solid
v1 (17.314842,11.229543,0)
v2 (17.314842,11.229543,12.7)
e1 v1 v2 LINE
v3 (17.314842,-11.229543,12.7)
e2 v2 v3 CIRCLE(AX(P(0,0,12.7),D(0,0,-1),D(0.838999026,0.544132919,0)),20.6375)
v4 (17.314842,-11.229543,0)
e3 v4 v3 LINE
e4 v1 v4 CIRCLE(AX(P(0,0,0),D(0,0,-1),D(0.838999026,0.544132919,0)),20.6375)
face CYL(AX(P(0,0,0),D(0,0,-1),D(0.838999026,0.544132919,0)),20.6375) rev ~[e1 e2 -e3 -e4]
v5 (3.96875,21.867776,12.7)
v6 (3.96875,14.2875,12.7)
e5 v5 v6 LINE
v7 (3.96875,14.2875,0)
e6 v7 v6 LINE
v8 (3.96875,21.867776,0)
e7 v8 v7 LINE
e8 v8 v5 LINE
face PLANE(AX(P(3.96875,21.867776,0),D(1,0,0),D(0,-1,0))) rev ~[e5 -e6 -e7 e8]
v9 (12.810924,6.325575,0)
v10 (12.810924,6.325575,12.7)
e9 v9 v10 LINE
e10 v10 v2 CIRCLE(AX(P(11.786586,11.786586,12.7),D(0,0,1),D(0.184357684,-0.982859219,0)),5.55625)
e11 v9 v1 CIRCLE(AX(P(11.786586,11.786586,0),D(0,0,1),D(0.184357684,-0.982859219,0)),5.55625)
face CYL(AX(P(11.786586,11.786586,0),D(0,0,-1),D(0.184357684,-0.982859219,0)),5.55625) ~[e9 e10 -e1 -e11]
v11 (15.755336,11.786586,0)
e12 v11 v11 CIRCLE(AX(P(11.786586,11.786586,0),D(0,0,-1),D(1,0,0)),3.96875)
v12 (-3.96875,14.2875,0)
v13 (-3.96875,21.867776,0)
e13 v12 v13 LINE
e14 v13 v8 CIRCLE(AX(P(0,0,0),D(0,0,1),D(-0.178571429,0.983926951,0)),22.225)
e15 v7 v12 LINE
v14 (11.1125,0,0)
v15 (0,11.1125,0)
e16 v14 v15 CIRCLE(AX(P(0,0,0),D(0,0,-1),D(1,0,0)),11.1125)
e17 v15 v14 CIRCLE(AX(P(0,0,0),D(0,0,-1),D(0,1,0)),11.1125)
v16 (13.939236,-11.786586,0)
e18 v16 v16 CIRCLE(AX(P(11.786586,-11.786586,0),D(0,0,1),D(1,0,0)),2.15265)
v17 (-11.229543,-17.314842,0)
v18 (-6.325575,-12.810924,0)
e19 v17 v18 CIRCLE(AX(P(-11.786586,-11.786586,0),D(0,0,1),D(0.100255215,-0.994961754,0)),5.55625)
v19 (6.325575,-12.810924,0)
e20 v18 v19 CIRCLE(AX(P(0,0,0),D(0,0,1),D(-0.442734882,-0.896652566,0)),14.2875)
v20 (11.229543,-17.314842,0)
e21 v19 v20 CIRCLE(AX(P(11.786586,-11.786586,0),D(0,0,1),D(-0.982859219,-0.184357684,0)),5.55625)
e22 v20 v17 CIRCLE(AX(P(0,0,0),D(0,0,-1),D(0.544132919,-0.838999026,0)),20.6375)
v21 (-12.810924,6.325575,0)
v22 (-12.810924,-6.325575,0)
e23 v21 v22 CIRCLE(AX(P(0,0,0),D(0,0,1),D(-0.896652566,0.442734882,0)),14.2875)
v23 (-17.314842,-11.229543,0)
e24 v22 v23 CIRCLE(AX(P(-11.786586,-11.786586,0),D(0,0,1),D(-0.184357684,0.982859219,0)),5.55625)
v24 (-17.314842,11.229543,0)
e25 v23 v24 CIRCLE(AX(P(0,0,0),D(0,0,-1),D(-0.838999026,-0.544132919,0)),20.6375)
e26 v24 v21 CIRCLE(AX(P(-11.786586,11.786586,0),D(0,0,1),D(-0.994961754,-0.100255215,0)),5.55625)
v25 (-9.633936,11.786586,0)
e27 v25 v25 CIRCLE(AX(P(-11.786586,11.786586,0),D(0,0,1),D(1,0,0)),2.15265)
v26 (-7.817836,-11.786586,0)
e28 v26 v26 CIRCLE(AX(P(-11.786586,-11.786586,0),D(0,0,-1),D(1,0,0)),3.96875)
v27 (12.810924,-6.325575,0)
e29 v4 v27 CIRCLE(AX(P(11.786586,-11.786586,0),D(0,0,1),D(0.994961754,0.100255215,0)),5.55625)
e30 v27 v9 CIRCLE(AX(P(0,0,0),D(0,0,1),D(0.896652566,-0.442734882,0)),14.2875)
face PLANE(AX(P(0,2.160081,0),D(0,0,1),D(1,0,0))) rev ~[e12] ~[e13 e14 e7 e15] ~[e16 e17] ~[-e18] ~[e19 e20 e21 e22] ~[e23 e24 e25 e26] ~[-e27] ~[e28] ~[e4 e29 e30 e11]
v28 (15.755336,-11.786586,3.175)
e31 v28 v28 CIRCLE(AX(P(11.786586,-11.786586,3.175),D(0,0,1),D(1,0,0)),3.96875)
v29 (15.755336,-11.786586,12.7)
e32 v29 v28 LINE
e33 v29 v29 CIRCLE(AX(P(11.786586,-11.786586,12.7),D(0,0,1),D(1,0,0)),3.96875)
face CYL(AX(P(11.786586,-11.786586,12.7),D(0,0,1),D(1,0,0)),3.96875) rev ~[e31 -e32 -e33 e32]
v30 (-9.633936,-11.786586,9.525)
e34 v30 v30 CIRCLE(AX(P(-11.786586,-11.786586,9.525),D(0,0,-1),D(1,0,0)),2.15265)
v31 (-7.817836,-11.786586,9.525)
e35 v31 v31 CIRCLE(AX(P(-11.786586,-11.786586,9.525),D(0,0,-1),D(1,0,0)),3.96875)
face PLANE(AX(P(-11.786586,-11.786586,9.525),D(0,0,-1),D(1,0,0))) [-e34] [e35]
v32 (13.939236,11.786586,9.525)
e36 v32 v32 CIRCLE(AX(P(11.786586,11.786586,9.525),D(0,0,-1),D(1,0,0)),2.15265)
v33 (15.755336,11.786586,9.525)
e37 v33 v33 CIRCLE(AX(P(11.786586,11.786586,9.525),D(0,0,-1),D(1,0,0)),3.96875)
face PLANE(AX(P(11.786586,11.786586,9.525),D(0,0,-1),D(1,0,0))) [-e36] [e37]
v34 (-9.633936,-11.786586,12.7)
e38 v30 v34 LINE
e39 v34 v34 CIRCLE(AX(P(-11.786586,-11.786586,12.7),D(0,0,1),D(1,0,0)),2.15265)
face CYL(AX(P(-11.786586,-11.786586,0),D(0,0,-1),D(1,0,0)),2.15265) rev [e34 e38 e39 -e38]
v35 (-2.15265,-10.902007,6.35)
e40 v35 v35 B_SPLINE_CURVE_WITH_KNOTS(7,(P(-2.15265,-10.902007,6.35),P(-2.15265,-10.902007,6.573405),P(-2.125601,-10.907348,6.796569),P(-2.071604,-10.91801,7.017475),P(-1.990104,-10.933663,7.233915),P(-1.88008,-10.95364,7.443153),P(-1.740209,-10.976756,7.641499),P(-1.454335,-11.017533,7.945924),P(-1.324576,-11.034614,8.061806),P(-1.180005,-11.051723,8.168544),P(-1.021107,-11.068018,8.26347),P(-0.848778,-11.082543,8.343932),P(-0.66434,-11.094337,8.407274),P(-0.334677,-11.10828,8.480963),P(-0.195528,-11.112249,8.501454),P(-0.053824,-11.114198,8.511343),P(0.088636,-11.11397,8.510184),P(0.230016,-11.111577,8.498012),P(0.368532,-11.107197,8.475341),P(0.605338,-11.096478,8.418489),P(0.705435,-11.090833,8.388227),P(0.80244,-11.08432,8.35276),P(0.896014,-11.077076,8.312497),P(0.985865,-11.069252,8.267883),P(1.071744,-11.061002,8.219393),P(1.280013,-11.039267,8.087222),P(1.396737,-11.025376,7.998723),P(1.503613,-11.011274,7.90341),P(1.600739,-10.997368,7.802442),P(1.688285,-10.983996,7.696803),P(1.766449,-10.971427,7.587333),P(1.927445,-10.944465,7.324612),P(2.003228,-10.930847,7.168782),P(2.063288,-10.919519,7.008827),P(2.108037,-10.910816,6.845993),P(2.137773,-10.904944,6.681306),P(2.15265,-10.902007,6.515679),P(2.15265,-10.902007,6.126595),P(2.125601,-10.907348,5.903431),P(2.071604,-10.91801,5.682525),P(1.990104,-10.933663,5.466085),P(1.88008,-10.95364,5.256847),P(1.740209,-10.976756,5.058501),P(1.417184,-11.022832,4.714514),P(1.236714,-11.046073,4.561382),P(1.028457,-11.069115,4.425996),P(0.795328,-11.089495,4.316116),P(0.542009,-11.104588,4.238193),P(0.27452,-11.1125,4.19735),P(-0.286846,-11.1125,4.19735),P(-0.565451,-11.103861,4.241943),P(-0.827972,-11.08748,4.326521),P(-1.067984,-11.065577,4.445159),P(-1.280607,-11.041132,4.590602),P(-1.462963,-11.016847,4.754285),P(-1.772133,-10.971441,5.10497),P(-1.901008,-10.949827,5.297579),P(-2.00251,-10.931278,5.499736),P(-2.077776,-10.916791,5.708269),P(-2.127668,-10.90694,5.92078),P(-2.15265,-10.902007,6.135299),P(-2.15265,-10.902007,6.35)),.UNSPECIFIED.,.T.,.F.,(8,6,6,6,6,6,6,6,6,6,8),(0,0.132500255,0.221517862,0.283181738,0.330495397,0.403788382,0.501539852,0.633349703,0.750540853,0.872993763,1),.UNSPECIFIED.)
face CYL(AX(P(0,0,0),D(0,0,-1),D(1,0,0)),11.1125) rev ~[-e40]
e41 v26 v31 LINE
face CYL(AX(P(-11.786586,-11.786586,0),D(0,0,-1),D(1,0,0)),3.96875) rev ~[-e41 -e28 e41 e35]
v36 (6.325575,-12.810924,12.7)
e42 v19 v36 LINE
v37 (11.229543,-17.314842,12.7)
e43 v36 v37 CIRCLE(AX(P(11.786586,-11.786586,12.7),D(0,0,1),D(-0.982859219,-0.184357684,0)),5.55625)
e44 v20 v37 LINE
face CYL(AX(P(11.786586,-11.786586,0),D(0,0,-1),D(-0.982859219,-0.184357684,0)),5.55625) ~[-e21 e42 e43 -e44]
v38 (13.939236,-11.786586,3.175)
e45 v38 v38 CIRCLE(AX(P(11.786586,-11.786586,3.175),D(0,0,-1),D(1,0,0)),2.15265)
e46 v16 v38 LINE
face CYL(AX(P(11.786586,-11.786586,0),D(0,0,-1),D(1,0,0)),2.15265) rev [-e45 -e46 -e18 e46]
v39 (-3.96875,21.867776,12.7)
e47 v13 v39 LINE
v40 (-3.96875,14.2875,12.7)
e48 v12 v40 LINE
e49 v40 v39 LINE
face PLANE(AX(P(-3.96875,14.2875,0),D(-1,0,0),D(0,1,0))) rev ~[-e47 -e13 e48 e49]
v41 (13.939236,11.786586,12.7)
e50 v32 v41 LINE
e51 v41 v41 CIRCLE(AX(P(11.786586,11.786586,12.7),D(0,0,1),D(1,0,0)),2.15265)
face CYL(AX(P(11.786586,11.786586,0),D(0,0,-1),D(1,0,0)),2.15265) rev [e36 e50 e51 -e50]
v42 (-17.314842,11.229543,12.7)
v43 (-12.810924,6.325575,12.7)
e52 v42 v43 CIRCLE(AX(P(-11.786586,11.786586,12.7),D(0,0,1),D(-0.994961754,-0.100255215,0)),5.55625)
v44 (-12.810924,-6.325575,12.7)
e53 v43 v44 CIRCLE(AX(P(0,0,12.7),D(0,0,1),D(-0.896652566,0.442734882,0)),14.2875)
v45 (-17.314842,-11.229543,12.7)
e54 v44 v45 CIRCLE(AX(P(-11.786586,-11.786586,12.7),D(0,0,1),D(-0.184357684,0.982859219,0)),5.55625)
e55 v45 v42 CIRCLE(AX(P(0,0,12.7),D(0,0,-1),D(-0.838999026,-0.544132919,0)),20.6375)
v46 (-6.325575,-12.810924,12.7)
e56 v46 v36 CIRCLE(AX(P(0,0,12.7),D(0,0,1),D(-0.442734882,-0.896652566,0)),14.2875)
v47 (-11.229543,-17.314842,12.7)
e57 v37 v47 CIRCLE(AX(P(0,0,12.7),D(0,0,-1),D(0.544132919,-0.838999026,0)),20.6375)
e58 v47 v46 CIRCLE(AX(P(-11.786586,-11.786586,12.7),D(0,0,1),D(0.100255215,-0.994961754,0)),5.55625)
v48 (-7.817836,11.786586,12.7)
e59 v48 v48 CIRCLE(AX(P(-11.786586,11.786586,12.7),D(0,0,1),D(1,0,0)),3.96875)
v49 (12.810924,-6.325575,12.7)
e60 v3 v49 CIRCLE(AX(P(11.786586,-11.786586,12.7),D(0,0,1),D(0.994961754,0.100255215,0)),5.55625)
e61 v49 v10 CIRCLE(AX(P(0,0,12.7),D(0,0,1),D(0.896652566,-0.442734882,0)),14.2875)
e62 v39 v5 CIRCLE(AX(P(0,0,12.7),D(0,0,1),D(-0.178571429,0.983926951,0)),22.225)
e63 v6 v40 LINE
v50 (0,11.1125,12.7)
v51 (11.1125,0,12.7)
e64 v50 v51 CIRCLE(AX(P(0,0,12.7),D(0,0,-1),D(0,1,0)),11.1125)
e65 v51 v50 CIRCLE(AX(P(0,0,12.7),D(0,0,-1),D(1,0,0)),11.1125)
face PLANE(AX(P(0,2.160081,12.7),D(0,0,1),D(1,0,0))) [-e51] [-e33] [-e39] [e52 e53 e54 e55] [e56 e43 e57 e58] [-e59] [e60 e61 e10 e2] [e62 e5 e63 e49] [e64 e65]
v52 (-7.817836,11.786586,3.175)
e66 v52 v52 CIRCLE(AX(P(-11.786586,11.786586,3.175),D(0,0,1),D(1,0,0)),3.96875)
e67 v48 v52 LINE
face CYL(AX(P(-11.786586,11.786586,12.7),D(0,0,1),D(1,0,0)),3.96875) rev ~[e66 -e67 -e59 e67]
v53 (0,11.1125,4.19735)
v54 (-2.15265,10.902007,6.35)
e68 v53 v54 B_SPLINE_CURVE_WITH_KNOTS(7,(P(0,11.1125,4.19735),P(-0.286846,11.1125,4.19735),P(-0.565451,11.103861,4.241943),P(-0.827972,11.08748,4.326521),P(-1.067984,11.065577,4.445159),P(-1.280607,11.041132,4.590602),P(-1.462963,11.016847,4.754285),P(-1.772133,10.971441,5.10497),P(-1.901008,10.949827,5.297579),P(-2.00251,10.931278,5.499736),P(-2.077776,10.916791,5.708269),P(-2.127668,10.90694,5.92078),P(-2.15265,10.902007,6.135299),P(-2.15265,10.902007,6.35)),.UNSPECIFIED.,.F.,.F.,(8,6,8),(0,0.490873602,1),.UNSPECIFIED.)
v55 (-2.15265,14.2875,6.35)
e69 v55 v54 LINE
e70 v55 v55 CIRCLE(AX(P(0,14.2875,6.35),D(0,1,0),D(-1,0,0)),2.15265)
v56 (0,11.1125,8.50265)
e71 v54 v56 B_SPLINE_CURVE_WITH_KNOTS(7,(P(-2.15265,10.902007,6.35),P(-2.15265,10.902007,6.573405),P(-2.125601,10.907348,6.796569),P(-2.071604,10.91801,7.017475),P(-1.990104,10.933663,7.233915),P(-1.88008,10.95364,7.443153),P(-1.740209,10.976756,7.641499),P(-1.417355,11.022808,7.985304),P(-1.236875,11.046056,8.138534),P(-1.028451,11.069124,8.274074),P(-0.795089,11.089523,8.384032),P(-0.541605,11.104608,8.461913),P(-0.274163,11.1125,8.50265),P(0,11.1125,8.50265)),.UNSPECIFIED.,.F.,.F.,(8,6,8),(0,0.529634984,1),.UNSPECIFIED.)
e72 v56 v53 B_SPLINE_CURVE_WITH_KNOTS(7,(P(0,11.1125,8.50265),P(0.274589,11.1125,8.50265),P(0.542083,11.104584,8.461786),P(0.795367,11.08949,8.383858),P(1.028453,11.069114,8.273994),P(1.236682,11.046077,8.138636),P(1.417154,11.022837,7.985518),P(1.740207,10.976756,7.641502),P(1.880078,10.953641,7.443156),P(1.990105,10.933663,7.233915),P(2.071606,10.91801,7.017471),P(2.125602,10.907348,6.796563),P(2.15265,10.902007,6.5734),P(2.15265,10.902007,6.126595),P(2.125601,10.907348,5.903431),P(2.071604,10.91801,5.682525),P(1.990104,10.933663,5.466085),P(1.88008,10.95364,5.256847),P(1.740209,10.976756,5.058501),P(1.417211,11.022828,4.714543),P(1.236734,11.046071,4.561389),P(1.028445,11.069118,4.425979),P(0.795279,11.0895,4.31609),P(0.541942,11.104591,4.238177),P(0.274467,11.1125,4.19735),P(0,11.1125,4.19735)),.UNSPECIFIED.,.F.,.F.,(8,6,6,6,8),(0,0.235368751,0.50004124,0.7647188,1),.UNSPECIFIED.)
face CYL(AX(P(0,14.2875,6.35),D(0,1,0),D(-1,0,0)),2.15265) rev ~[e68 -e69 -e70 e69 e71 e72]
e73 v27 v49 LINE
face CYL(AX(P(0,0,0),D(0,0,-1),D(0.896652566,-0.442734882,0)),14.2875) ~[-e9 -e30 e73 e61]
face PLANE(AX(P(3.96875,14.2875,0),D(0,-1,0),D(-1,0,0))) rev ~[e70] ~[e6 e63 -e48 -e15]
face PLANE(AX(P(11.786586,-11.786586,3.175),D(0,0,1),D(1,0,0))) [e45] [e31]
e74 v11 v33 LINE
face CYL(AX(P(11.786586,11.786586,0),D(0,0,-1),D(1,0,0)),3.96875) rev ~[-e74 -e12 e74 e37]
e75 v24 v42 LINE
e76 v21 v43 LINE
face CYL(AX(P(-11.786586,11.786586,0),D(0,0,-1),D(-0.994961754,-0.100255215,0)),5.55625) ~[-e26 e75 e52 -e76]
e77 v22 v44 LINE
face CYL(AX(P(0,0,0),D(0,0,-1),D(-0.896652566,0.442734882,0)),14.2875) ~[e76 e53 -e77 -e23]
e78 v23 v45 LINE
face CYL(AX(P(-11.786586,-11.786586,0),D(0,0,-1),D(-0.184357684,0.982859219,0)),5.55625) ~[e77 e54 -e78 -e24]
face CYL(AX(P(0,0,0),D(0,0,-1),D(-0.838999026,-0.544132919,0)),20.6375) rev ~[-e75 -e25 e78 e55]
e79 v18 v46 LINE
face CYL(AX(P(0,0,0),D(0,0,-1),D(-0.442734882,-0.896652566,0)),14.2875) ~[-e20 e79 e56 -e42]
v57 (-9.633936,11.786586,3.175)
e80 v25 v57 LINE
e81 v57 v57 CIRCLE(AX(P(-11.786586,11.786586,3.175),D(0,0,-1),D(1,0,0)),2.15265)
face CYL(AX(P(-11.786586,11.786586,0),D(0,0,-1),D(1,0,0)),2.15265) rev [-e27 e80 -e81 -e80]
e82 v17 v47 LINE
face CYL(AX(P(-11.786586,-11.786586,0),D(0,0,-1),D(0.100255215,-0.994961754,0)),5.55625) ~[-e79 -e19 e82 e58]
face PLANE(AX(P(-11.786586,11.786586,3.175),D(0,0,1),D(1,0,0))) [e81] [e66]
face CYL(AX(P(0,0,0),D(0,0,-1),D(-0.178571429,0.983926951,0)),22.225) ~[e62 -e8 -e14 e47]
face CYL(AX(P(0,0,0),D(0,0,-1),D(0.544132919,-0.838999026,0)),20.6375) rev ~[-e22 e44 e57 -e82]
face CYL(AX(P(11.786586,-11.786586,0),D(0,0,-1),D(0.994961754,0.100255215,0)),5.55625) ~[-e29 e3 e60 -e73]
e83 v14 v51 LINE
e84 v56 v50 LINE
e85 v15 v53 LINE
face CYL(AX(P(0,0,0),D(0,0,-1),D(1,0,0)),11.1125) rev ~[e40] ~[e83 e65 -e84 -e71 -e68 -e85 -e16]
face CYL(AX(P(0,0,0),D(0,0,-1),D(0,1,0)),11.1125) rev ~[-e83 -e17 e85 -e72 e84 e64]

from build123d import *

# Parameters (mm, degrees)
F0_R            = 2.15265
F1_DEPTH        = 12.7
F2_R            = 2.15265
F3_REACH        = 42.6021136501
F6_R            = 3.96875
F7_DEPTH        = 9.525
F9_DEPTH        = 12.7
F9_COPIES_COUNT = 3
F9_COPIES_ANGLE = 180
F10_R           = 3.96875
F11_DEPTH       = 9.525


# Not quite as in the source:
# - a pattern or mirror of a feature is missing from the dataset's text; its kind, count and spacing are read off the source's solid


with BuildPart() as f1:
    # F0 (on Top) → F1 (new body)
    with BuildSketch(Plane.XY):
        with BuildLine():
            Line((3.96875, 14.2875), (0, 14.2875))
            Line((0, 14.2875), (-3.96875, 14.2875))
            Line((-3.96875, 14.2875), (-3.96875, 21.8677764859))
            ThreePointArc((-3.96875, 21.8677764859), (0, -22.225), (3.96875, 21.8677764859))
            Line((3.96875, 21.8677764859), (3.96875, 14.2875))
        make_face()
        with Locations((-11.7865861589, -11.7865861589)):
            Circle(F0_R, mode=Mode.SUBTRACT)
        with Locations((11.7865861589, -11.7865861589)):
            Circle(F0_R, mode=Mode.SUBTRACT)
        with Locations((-11.7865861589, 11.7865861589)):
            Circle(F0_R, mode=Mode.SUBTRACT)
        with BuildLine():
            ThreePointArc((0, 11.1125), (7.8577241059, 7.8577241059), (11.1125, 0))
            ThreePointArc((11.1125, 0), (-7.8577241059, -7.8577241059), (0, 11.1125))
        make_face(mode=Mode.SUBTRACT)
        with Locations((11.7865861589, 11.7865861589)):
            Circle(F0_R, mode=Mode.SUBTRACT)
    extrude(amount=F1_DEPTH)

    f3_end = f1.faces().sort_by_distance((0, -11.1125, 6.35))[0]
    # F2 (on face) → F3 (cut, up to a face of the model that its end follows)
    with BuildSketch(Plane(origin=(0, 14.2875, 0), x_dir=(-1, 0, 0), z_dir=(0, 1, 0))):
        with Locations((0, 6.35)):
            Circle(F2_R)
    f3_long = extrude(amount=-F3_REACH, mode=Mode.PRIVATE)
    add(split(f3_long, bisect_by=f3_end, keep=Keep.ALL, mode=Mode.PRIVATE).solids().sort_by_distance((0, 14.2875, 6.35))[0], mode=Mode.SUBTRACT)

    # F6 (on face) → F7 (cut, through all)
    with BuildSketch(Plane(origin=(0, 0, 0), x_dir=(1, 0, 0), z_dir=(0, 0, -1))):
        with Locations((11.7865861589, -11.7865861589)):
            Circle(F6_R)
        with Locations((-11.7865861589, 11.7865861589)):
            Circle(F6_R)
    extrude(amount=-F7_DEPTH, mode=Mode.SUBTRACT)

    # F8 (on face) → F9 (cut, through all)
    with BuildSketch(Plane(origin=(0, 0, 0), x_dir=(1, 0, 0), z_dir=(0, 0, -1))):
        with BuildLine():
            ThreePointArc((-17.3148424047, -11.229543123), (-15.8788163052, -8.0281867), (-12.8109235396, -6.3255746232))
            ThreePointArc((-12.8109235396, -6.3255746232), (-14.2875, 0), (-12.8109235396, 6.3255746232))
            ThreePointArc((-12.8109235396, 6.3255746232), (-15.8788163052, 8.0281867), (-17.3148424047, 11.229543123))
            ThreePointArc((-17.3148424047, 11.229543123), (-20.6375, 0), (-17.3148424047, -11.229543123))
        make_face()
    f9 = extrude(amount=-F9_DEPTH, mode=Mode.SUBTRACT)

    # F9_copies: F9 ×3 about axis
    f9_copies_axis = Axis((0, 0, 0), (0, 0, 1))
    for i in range(1, F9_COPIES_COUNT):
        add(f9.rotate(f9_copies_axis, i * F9_COPIES_ANGLE / (F9_COPIES_COUNT - 1)), mode=Mode.SUBTRACT)

    # F10 (on face) → F11 (cut, through all)
    with BuildSketch(Plane.XY.offset(12.7)):
        with Locations((11.7865861589, -11.7865861589)):
            Circle(F10_R)
        with Locations((-11.7865861589, 11.7865861589)):
            Circle(F10_R)
    extrude(amount=-F11_DEPTH, mode=Mode.SUBTRACT)


solid = f1.part
